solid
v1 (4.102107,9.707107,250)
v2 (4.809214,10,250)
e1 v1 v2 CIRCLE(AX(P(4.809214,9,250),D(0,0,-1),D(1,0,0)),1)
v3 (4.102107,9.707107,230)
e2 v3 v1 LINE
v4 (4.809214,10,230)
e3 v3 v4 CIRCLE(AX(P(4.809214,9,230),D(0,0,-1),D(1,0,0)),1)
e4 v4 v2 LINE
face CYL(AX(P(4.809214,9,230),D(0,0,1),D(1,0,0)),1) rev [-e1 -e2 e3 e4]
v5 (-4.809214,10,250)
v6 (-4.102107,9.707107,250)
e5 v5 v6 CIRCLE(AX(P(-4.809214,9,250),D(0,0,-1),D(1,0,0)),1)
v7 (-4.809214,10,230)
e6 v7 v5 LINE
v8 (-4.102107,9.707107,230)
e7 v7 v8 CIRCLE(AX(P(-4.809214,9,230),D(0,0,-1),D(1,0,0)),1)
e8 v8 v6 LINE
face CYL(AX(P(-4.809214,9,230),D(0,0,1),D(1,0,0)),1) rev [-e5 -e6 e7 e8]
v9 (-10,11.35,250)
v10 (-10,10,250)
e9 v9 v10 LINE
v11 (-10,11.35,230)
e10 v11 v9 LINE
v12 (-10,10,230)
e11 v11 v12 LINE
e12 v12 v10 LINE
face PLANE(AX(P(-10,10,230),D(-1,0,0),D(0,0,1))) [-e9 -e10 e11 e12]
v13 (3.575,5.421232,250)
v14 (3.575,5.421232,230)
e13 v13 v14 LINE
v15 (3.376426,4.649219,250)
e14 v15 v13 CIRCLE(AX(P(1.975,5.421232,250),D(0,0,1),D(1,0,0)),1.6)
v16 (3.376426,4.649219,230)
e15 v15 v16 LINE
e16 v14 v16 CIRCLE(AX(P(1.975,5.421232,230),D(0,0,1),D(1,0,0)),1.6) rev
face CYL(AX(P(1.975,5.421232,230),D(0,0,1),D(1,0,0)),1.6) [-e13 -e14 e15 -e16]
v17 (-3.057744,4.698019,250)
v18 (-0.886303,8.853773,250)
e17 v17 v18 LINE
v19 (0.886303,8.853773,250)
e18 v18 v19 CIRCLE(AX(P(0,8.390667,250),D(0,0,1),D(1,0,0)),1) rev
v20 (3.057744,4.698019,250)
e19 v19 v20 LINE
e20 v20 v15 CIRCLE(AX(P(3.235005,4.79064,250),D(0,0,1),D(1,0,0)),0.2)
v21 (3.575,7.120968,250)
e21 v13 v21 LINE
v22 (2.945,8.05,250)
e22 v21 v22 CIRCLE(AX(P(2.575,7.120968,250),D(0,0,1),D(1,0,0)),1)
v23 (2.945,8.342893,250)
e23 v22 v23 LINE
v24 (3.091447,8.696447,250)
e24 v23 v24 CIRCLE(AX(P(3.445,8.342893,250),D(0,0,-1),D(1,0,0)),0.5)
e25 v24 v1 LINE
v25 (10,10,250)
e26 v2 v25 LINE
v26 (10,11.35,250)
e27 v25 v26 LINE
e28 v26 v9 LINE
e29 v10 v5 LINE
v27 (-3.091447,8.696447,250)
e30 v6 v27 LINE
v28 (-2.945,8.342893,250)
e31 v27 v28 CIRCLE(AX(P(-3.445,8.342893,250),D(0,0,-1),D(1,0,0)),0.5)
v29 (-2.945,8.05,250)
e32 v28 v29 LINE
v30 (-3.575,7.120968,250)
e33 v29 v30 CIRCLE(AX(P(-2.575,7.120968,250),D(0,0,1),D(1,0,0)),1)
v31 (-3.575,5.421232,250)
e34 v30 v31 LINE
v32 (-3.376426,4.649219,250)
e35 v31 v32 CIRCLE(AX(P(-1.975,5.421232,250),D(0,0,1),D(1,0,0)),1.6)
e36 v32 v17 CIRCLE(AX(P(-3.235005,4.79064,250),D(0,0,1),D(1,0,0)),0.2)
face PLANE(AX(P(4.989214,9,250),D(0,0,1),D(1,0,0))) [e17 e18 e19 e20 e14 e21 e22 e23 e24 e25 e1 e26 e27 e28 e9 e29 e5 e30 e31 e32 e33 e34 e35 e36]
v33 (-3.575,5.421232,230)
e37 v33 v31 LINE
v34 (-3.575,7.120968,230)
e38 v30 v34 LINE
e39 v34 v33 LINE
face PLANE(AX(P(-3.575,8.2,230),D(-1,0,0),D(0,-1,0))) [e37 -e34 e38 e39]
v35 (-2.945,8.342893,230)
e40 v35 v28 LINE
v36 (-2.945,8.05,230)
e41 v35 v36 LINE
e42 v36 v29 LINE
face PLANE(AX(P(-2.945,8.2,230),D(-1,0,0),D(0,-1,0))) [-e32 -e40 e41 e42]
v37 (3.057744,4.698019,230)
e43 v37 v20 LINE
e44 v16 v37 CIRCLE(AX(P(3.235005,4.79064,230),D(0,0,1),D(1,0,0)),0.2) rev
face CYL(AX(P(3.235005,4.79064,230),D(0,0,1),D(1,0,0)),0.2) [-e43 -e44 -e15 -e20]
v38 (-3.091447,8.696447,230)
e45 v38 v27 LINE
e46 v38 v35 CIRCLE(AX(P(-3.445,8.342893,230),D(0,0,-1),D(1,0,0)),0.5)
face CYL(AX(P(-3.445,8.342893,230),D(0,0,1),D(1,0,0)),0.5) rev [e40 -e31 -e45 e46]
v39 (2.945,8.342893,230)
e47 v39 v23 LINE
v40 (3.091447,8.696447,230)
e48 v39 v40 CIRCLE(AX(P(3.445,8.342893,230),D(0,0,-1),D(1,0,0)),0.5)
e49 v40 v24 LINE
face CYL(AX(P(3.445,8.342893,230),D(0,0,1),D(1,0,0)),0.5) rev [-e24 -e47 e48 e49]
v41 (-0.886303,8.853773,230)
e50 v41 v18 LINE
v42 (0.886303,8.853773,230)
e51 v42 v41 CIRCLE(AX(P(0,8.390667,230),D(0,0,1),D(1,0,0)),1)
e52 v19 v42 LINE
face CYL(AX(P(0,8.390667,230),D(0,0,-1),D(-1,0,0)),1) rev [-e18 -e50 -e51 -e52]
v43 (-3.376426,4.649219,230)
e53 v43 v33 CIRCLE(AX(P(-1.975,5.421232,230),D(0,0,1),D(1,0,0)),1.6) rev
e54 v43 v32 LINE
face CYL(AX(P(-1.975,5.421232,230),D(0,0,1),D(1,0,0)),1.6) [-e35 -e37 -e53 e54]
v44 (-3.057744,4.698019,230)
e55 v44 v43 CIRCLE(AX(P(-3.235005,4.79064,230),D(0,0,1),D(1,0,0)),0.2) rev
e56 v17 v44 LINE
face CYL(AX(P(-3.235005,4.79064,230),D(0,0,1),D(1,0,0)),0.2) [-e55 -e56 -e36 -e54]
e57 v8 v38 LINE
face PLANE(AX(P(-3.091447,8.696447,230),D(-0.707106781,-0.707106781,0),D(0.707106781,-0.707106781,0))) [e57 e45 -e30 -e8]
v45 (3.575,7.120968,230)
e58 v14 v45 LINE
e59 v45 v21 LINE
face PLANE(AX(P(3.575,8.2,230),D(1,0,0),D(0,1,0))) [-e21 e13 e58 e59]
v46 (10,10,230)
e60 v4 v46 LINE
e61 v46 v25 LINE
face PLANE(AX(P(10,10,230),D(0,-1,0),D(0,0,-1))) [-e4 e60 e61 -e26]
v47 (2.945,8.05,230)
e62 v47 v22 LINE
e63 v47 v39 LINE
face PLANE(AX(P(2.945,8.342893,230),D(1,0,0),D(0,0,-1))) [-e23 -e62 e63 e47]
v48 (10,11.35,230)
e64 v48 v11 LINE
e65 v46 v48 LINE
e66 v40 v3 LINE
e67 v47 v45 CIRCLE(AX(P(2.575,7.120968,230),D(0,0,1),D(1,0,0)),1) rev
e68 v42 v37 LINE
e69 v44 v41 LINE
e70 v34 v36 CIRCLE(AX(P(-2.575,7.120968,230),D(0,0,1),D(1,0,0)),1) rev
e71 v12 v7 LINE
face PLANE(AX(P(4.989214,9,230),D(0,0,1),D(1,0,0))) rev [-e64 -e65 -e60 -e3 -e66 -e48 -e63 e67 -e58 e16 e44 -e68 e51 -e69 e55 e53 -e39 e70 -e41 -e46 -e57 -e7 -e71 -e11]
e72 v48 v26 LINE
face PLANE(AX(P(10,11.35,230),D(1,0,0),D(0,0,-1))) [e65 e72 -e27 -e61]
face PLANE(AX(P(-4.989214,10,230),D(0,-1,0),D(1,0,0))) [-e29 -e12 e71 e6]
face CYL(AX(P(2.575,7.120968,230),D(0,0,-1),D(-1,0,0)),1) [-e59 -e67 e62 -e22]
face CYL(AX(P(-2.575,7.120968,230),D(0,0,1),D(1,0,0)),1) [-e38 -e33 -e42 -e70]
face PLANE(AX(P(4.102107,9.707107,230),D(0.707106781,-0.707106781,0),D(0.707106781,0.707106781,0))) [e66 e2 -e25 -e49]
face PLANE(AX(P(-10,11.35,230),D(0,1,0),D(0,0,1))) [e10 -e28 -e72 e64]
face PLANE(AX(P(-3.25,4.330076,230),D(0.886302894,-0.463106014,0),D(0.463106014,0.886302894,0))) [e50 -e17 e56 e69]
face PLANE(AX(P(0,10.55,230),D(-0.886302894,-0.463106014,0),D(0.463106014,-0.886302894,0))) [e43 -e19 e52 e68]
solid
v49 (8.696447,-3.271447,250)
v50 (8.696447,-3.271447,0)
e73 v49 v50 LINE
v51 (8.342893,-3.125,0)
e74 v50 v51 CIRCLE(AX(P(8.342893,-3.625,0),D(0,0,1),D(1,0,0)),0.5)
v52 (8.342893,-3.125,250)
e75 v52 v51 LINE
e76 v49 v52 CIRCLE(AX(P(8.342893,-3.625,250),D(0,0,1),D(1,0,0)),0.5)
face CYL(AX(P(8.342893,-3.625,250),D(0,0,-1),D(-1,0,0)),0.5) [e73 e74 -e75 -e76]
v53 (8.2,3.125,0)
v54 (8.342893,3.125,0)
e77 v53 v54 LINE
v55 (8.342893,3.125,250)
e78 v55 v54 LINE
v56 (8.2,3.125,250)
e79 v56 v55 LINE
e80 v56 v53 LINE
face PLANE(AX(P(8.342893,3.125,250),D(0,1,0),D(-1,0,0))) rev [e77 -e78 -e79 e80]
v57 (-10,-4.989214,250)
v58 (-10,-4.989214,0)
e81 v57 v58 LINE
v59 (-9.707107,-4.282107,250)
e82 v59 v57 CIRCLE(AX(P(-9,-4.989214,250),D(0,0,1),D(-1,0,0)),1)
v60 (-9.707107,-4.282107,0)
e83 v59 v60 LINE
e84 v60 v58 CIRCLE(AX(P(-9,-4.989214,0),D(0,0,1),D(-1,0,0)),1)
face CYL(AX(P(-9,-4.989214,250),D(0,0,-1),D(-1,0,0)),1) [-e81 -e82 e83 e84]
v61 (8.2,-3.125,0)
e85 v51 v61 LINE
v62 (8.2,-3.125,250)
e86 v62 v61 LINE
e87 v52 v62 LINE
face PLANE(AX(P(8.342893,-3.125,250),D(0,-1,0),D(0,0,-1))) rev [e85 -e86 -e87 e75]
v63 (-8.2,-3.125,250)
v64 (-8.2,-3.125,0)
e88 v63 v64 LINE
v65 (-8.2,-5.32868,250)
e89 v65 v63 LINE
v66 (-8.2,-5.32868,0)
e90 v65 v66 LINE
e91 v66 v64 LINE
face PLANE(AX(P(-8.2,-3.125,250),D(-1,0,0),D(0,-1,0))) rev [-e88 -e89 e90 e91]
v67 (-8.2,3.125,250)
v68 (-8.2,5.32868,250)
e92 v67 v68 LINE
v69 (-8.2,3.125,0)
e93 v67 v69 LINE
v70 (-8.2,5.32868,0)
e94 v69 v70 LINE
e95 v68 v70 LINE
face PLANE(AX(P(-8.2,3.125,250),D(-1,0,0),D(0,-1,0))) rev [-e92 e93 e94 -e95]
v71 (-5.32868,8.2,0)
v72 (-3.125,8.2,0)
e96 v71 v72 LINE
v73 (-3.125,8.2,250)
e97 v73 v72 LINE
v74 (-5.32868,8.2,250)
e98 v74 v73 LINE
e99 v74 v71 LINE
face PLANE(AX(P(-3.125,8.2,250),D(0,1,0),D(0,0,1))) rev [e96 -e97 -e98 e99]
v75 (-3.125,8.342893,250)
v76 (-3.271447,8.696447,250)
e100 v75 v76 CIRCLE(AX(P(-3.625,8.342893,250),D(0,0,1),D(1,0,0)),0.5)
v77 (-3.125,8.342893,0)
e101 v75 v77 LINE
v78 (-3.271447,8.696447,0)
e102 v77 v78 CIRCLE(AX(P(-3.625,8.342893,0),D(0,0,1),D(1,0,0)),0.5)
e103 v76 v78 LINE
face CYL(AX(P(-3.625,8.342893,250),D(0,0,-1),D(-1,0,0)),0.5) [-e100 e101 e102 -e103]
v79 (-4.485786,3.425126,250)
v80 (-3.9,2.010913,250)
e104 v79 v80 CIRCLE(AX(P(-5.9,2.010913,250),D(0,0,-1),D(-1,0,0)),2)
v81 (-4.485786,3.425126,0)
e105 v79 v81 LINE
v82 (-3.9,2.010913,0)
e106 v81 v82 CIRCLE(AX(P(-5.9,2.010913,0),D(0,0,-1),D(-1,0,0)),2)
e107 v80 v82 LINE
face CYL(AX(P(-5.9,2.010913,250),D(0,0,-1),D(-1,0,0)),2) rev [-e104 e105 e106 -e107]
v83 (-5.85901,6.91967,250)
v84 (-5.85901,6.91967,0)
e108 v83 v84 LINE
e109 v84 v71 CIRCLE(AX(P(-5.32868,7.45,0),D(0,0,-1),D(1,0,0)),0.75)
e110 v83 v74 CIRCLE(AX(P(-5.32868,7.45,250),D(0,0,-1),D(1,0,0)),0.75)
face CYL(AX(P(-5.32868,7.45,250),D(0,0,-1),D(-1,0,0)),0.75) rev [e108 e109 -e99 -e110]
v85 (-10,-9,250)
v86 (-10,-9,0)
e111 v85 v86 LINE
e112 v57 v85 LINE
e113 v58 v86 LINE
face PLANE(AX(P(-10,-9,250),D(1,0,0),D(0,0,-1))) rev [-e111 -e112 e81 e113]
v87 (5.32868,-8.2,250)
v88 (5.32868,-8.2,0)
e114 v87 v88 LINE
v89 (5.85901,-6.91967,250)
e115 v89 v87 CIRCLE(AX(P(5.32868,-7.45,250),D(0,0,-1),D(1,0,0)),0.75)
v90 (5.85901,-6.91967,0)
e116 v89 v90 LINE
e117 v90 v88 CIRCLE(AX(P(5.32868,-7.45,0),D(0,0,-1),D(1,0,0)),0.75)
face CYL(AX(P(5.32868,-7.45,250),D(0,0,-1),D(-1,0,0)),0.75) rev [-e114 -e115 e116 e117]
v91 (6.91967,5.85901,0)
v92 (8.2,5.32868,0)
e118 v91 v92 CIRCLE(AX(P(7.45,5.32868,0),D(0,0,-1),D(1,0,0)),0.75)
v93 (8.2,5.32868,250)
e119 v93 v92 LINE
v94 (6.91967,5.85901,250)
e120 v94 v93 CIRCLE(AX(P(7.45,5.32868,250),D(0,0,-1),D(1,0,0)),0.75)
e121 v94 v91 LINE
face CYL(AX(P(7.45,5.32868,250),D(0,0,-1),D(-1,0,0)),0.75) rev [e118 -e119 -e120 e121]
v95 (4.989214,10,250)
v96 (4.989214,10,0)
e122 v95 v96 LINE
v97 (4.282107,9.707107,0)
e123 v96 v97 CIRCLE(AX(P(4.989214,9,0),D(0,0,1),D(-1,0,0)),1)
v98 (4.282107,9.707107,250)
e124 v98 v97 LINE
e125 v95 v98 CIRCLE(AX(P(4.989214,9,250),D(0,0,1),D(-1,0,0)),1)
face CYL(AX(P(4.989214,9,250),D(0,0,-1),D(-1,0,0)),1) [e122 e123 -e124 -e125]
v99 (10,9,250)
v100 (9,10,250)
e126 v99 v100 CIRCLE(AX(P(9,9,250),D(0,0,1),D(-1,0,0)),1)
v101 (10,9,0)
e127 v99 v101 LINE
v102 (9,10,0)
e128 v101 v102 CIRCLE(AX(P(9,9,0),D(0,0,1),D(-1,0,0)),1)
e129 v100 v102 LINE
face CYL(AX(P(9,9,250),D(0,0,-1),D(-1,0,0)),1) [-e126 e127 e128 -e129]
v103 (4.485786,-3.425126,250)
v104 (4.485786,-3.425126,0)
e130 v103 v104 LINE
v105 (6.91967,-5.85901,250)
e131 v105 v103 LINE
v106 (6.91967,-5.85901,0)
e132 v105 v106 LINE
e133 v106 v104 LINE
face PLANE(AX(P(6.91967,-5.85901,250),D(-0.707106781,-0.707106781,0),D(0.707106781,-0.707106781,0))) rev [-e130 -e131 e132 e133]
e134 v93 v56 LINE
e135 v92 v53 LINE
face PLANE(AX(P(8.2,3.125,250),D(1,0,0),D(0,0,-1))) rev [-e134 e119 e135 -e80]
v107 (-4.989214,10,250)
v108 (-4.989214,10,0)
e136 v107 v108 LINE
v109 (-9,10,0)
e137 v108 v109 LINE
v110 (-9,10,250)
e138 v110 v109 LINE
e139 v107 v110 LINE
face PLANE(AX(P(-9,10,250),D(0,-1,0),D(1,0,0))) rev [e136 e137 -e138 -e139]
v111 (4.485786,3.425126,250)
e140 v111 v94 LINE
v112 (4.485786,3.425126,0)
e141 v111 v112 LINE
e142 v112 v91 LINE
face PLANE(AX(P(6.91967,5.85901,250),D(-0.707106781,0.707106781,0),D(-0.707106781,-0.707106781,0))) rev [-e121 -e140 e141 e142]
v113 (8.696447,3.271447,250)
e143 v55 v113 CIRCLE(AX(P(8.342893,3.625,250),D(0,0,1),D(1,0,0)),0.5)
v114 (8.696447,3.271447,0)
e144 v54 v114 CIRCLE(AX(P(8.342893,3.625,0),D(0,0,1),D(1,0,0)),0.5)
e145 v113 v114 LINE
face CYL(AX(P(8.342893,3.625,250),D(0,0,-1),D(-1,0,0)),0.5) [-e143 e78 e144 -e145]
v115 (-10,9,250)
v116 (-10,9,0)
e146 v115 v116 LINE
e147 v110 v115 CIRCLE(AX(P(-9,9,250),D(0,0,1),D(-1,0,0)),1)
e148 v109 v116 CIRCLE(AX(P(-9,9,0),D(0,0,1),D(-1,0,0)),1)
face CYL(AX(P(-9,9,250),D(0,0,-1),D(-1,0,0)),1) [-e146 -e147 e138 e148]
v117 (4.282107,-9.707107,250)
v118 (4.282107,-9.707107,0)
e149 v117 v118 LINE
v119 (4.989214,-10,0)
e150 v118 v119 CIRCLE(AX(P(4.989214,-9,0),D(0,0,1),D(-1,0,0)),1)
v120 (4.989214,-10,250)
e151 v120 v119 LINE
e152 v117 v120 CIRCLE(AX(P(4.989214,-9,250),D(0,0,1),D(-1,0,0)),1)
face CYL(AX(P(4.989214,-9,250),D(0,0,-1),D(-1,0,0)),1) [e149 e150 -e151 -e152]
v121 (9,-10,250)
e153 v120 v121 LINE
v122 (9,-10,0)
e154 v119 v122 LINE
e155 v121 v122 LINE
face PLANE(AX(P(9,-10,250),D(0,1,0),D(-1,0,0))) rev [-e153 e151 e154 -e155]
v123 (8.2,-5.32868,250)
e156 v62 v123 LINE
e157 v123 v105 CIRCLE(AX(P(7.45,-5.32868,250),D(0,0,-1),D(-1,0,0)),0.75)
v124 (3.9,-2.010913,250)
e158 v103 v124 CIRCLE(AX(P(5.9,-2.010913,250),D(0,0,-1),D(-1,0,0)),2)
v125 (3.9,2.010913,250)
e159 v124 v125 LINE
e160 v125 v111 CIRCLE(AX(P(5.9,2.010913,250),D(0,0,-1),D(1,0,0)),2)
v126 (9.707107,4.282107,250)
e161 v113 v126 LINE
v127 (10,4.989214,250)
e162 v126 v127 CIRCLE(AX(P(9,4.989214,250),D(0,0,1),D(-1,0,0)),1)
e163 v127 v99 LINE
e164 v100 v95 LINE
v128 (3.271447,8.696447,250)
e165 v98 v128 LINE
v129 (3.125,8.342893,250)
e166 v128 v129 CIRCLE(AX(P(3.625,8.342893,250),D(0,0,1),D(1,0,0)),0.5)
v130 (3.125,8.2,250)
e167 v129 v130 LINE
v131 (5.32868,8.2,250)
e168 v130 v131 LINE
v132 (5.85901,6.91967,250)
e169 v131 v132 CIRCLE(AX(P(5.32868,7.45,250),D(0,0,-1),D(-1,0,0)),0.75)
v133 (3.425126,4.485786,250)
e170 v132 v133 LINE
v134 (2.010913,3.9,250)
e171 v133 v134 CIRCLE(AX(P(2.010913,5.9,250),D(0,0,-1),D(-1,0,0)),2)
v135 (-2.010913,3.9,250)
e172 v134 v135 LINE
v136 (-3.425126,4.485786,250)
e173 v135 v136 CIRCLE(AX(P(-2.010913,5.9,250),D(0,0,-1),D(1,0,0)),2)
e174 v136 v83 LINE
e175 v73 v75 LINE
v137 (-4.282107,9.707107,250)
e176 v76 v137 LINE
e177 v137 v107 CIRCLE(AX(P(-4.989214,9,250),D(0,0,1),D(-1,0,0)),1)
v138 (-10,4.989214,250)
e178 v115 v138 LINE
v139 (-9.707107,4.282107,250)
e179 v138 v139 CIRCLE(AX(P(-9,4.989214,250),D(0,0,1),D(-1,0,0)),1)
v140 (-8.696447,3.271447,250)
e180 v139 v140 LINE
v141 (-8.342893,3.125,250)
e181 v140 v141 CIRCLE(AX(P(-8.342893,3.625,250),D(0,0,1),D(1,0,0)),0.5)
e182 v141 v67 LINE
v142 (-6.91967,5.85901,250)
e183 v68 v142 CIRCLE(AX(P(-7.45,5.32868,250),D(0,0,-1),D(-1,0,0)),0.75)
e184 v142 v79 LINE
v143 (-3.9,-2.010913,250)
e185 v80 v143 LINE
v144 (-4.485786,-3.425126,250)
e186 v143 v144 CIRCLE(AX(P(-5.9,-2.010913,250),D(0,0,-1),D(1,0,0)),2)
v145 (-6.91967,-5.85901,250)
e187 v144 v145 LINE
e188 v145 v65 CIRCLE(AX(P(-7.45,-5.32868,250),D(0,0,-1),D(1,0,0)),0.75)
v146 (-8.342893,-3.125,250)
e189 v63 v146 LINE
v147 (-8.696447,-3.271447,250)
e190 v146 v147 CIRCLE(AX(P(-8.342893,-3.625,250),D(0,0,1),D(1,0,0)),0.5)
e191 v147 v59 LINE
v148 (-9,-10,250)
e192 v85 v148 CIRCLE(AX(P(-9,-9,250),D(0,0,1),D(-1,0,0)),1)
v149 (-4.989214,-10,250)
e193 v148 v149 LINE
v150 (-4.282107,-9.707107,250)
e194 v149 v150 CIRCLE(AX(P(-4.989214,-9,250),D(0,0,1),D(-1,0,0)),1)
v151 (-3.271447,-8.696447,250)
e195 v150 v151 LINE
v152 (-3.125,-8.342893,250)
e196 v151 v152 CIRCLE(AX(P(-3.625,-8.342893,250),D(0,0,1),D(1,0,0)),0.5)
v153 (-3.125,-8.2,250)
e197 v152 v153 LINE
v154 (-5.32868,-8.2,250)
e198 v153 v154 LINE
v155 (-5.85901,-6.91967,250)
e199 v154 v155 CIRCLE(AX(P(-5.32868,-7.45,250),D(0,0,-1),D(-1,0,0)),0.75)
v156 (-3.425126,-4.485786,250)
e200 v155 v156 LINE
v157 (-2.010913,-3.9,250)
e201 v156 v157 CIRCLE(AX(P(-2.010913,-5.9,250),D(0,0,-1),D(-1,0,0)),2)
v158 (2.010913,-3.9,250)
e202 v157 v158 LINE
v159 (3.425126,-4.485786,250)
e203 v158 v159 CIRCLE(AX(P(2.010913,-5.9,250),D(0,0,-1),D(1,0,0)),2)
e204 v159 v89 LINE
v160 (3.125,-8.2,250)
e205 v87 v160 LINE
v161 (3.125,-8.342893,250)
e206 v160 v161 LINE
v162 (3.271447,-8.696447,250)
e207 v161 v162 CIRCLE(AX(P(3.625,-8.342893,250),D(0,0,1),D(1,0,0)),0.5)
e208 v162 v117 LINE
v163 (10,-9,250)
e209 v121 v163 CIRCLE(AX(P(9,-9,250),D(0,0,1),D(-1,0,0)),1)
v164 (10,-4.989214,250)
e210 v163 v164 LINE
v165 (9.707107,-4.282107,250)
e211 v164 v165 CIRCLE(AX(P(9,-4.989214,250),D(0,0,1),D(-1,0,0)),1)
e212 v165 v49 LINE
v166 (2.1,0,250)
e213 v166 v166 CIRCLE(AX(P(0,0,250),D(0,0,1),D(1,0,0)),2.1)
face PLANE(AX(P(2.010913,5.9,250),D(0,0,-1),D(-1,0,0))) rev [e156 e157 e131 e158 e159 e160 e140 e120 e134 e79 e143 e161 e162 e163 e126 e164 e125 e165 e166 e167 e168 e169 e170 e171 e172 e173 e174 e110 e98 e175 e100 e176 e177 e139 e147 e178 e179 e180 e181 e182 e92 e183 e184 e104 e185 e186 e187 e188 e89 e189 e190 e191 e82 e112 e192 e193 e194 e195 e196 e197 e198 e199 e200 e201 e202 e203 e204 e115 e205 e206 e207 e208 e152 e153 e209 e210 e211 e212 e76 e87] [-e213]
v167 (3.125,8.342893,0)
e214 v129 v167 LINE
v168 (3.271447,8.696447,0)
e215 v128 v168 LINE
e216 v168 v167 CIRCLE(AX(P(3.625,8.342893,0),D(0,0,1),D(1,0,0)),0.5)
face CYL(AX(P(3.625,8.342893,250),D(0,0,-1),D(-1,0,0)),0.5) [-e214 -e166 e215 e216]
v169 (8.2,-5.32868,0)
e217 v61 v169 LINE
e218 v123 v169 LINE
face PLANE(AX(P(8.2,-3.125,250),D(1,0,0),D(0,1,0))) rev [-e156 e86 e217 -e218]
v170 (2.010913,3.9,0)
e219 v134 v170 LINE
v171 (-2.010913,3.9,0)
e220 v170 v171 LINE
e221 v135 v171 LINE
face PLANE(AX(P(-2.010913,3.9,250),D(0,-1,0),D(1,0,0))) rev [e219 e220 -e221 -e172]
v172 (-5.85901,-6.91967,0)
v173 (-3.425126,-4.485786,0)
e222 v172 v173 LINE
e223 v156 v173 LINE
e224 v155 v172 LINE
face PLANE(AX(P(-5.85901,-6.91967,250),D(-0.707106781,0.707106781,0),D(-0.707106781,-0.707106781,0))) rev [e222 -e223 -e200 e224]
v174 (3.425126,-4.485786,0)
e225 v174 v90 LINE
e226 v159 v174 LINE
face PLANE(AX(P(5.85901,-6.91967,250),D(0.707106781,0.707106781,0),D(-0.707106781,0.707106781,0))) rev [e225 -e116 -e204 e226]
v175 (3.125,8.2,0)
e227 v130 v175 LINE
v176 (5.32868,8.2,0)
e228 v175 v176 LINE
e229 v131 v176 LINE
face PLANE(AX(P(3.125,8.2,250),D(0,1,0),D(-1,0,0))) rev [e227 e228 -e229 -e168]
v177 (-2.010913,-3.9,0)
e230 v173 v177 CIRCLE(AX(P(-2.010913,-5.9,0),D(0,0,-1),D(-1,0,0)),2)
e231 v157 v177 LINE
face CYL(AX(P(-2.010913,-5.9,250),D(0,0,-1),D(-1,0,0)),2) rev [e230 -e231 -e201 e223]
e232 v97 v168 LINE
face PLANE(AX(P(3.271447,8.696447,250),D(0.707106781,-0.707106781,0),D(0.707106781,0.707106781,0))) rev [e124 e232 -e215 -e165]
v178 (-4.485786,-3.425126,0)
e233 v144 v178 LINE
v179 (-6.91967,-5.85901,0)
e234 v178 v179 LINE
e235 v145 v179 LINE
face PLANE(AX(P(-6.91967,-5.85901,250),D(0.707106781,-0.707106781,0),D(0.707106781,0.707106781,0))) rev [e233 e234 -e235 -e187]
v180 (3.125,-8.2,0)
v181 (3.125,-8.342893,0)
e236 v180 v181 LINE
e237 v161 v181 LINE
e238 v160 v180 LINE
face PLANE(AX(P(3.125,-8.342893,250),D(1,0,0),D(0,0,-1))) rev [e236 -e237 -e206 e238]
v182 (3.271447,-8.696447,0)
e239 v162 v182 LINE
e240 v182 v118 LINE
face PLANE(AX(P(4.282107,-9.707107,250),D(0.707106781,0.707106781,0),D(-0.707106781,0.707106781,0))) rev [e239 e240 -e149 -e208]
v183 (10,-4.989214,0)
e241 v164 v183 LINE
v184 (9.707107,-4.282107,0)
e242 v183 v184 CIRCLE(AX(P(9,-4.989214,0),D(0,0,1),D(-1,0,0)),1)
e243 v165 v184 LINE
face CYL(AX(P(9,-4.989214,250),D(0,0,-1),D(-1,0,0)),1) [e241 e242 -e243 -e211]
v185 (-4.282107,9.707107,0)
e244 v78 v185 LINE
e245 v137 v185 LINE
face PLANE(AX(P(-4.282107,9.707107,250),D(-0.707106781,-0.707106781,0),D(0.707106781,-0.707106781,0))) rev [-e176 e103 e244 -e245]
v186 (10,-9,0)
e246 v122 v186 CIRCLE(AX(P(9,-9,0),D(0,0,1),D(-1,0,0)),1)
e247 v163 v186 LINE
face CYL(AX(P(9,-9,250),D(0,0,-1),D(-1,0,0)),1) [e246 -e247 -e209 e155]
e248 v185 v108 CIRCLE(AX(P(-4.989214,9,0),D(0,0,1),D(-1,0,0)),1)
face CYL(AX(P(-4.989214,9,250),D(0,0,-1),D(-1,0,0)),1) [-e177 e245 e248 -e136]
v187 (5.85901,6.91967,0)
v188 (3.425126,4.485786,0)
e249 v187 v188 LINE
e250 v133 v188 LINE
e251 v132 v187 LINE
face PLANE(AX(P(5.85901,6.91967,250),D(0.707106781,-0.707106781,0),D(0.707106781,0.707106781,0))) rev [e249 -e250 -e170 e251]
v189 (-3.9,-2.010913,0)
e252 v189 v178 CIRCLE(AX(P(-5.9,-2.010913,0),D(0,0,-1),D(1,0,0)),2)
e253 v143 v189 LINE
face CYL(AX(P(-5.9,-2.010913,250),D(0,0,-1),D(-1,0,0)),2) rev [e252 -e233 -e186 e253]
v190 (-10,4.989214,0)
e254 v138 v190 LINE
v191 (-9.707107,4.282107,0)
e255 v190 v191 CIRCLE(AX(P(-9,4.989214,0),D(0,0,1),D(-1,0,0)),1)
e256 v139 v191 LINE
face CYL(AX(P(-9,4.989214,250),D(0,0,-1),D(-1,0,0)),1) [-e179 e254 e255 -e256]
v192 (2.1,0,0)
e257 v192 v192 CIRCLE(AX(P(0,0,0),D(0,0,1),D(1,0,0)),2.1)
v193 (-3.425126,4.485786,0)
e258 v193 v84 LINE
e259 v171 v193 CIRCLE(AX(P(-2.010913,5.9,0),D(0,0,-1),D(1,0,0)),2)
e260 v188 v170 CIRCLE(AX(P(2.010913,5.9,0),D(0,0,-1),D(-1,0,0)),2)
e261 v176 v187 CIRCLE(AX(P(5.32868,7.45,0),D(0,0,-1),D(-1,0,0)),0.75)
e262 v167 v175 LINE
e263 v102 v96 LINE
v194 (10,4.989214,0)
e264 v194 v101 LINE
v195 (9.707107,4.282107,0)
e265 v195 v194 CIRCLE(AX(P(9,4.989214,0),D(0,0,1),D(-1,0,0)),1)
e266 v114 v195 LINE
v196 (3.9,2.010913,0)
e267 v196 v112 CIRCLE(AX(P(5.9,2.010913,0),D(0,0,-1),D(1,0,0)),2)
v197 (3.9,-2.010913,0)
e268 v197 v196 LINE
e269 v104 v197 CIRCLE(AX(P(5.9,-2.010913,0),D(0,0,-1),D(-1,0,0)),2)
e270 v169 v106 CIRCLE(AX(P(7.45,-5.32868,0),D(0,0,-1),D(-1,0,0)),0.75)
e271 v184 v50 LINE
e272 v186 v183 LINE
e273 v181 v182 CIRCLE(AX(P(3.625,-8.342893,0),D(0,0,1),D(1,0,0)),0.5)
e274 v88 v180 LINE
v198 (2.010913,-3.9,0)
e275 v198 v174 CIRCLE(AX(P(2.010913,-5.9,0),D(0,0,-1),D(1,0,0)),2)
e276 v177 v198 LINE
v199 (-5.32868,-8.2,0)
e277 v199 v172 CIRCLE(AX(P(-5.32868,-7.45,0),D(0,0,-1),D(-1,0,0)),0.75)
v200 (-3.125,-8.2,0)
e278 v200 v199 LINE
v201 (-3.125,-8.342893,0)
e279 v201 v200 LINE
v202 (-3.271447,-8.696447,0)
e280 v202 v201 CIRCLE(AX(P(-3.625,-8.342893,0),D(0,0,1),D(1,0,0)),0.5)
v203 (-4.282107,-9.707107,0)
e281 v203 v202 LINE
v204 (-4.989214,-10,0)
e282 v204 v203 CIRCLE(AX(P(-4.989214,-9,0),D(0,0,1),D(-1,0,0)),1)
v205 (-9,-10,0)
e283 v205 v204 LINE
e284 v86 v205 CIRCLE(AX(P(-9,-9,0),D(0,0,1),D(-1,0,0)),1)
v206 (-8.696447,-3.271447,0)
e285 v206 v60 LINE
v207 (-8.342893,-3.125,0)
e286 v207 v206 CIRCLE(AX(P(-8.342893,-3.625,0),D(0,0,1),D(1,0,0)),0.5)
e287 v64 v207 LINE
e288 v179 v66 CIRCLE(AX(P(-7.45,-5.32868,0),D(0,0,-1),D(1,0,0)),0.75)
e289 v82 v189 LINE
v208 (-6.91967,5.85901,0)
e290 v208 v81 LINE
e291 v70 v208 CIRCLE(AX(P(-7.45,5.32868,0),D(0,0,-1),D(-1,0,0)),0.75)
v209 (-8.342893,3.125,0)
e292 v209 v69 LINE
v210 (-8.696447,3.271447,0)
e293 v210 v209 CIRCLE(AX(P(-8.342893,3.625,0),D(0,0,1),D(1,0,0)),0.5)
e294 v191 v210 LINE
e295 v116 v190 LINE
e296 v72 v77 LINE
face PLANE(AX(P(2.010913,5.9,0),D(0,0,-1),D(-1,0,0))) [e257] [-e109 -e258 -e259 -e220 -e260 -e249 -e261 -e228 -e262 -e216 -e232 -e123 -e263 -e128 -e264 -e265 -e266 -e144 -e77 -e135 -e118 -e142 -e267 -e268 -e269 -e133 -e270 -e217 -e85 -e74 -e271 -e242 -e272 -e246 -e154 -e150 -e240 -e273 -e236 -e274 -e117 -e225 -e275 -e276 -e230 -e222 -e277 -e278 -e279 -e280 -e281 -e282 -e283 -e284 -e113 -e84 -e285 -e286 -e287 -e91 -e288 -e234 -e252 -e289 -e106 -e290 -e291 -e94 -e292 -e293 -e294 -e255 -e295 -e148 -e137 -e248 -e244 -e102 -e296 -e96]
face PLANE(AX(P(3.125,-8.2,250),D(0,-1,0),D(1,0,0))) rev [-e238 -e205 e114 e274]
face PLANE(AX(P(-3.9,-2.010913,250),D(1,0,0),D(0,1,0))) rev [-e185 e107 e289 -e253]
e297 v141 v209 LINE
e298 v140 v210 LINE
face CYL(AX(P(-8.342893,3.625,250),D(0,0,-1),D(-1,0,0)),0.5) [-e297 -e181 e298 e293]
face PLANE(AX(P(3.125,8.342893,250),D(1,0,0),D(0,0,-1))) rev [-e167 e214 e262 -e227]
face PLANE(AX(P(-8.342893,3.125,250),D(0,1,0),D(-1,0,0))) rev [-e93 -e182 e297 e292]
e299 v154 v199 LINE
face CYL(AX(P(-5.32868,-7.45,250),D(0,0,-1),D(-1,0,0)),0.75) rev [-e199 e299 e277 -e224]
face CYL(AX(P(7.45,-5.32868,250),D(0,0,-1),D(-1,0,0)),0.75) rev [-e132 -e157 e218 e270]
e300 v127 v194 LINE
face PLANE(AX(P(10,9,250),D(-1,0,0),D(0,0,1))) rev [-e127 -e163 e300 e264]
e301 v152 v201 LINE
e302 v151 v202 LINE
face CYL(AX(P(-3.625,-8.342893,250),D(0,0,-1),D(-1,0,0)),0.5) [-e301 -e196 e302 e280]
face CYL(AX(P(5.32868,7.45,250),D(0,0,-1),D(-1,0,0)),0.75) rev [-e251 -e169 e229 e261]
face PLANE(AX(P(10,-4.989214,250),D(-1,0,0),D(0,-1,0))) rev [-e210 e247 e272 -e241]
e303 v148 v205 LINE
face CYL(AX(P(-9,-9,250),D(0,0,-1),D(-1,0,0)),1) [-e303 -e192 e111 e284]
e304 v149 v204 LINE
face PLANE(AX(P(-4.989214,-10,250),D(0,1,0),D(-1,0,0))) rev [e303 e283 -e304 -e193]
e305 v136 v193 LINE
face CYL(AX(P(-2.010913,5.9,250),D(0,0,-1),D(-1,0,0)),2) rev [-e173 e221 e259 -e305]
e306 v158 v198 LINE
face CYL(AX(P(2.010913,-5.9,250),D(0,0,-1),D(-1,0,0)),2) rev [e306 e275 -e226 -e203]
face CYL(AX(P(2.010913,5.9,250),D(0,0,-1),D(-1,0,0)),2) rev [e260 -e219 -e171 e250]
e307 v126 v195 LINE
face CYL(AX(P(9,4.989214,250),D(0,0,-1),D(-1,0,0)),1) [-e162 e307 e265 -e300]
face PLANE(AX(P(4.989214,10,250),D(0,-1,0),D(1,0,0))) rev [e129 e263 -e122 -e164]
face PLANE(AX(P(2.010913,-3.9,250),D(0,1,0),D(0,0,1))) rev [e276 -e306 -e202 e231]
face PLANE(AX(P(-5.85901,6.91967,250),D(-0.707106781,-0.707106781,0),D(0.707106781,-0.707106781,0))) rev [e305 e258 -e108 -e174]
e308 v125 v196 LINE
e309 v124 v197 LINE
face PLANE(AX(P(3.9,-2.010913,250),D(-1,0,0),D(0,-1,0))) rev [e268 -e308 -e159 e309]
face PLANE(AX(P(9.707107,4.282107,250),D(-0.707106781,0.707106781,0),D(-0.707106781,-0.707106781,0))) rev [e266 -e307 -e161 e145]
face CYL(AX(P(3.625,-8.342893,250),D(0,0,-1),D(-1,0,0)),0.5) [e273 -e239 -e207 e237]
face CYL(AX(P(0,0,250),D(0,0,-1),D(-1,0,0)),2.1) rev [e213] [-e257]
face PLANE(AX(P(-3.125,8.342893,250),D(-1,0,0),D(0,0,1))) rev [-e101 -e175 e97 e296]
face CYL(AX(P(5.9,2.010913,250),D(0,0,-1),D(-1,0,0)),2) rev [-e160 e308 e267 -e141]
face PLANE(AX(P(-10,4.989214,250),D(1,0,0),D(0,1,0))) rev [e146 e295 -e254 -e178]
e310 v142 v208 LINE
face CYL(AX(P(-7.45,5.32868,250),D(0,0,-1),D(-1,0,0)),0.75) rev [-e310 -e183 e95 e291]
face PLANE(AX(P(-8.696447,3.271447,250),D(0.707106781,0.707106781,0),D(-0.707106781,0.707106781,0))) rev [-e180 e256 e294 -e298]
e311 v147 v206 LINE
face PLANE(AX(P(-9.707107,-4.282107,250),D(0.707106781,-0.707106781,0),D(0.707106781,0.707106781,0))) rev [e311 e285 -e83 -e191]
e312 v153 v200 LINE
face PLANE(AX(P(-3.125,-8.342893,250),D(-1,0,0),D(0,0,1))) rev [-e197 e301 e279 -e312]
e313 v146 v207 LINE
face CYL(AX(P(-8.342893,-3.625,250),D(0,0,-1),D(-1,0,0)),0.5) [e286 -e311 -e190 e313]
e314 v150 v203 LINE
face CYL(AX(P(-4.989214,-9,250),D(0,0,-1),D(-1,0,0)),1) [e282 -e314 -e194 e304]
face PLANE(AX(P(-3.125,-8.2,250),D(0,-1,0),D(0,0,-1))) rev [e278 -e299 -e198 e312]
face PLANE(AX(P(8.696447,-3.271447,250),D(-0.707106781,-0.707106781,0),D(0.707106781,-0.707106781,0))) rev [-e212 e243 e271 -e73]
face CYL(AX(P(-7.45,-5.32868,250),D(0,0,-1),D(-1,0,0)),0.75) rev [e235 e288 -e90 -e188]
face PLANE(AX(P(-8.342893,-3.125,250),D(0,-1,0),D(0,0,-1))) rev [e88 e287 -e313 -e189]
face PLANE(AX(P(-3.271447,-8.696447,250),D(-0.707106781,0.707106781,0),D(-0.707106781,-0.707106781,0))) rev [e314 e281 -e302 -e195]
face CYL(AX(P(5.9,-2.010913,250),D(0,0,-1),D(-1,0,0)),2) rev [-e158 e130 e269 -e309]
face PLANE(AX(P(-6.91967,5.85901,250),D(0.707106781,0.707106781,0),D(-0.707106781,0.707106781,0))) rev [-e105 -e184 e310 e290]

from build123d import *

# Parameters (mm, degrees)
SKETCH_1_R          = 2.1
EXTRUDE_1_DEPTH     = 250
BOSS_EXTRUDE1_DEPTH = 20
MOVE_START          = 230
MOVE_FACE1_DEPTH    = 20
MOVE_FACE2_DEPTH    = 20
MOVE_FACE3_BY       = 0.15
MOVE_FACE3_2_BY     = 0.15
MOVE_FACE3_3_BY     = 0.15
MOVE_FACE3_4_BY     = 0.15
MOVE_FACE3_5_BY     = 0.15
MOVE_FACE3_6_BY     = 0.15
MOVE_FACE3_7_BY     = 0.15
MOVE_FACE3_8_BY     = 0.15
FILLET1_R           = 1
FILLET2_R           = 0.2
FILLET3_R           = 1.6
FILLET4_R           = 1


with BuildPart() as part:
    # Эскиз1 → Бобышка-Вытянуть1 (new body)
    with BuildSketch(Plane.XY):
        with BuildLine():
            Line((3.125, 8.342893219), (3.125, 8.2))
            Line((3.125, 8.2), (5.328679656, 8.2))
            ThreePointArc((5.328679656, 8.2), (6.021589306, 7.737012574), (5.859009742, 6.919669914))
            Line((5.859009742, 6.919669914), (3.425126266, 4.485786438))
            ThreePointArc((3.425126266, 4.485786438), (2.776279568, 4.052240935), (2.010912703, 3.9))
            Line((2.010912703, 3.9), (-2.010912703, 3.9))
            ThreePointArc((-2.010912703, 3.9), (-2.776279568, 4.052240935), (-3.425126266, 4.485786438))
            Line((-3.425126266, 4.485786438), (-5.859009742, 6.919669914))
            ThreePointArc((-5.859009742, 6.919669914), (-6.021589306, 7.737012574), (-5.328679656, 8.2))
            Line((-5.328679656, 8.2), (-3.125, 8.2))
            Line((-3.125, 8.2), (-3.125, 8.342893219))
            ThreePointArc((-3.125, 8.342893219), (-3.163060234, 8.534234935), (-3.271446609, 8.696446609))
            Line((-3.271446609, 8.696446609), (-4.282106781, 9.707106781))
            ThreePointArc((-4.282106781, 9.707106781), (-4.60653013, 9.923879533), (-4.989213562, 10))
            Line((-4.989213562, 10), (-9, 10))
            ThreePointArc((-9, 10), (-9.707106781, 9.707106781), (-10, 9))
            Line((-10, 9), (-10, 4.989213562))
            ThreePointArc((-10, 4.989213562), (-9.923879533, 4.60653013), (-9.707106781, 4.282106781))
            Line((-9.707106781, 4.282106781), (-8.696446609, 3.271446609))
            ThreePointArc((-8.696446609, 3.271446609), (-8.534234935, 3.163060234), (-8.342893219, 3.125))
            Line((-8.342893219, 3.125), (-8.2, 3.125))
            Line((-8.2, 3.125), (-8.2, 5.328679656))
            ThreePointArc((-8.2, 5.328679656), (-7.737012574, 6.021589306), (-6.919669914, 5.859009742))
            Line((-6.919669914, 5.859009742), (-4.485786438, 3.425126266))
            ThreePointArc((-4.485786438, 3.425126266), (-4.052240935, 2.776279568), (-3.9, 2.010912703))
            Line((-3.9, 2.010912703), (-3.9, -2.010912703))
            ThreePointArc((-3.9, -2.010912703), (-4.052240935, -2.776279568), (-4.485786438, -3.425126266))
            Line((-4.485786438, -3.425126266), (-6.919669914, -5.859009742))
            ThreePointArc((-6.919669914, -5.859009742), (-7.737012574, -6.021589306), (-8.2, -5.328679656))
            Line((-8.2, -5.328679656), (-8.2, -3.125))
            Line((-8.2, -3.125), (-8.342893219, -3.125))
            ThreePointArc((-8.342893219, -3.125), (-8.534234935, -3.163060234), (-8.696446609, -3.271446609))
            Line((-8.696446609, -3.271446609), (-9.707106781, -4.282106781))
            ThreePointArc((-9.707106781, -4.282106781), (-9.923879533, -4.60653013), (-10, -4.989213562))
            Line((-10, -4.989213562), (-10, -9))
            ThreePointArc((-10, -9), (-9.707106781, -9.707106781), (-9, -10))
            Line((-9, -10), (-4.989213562, -10))
            ThreePointArc((-4.989213562, -10), (-4.60653013, -9.923879533), (-4.282106781, -9.707106781))
            Line((-4.282106781, -9.707106781), (-3.271446609, -8.696446609))
            ThreePointArc((-3.271446609, -8.696446609), (-3.163060234, -8.534234935), (-3.125, -8.342893219))
            Line((-3.125, -8.342893219), (-3.125, -8.2))
            Line((-3.125, -8.2), (-5.328679656, -8.2))
            ThreePointArc((-5.328679656, -8.2), (-6.021589306, -7.737012574), (-5.859009742, -6.919669914))
            Line((-5.859009742, -6.919669914), (-3.425126266, -4.485786438))
            ThreePointArc((-3.425126266, -4.485786438), (-2.776279568, -4.052240935), (-2.010912703, -3.9))
            Line((-2.010912703, -3.9), (2.010912703, -3.9))
            ThreePointArc((2.010912703, -3.9), (2.776279568, -4.052240935), (3.425126266, -4.485786438))
            Line((3.425126266, -4.485786438), (5.859009742, -6.919669914))
            ThreePointArc((5.859009742, -6.919669914), (6.021589306, -7.737012574), (5.328679656, -8.2))
            Line((5.328679656, -8.2), (3.125, -8.2))
            Line((3.125, -8.2), (3.125, -8.342893219))
            ThreePointArc((3.125, -8.342893219), (3.163060234, -8.534234935), (3.271446609, -8.696446609))
            Line((3.271446609, -8.696446609), (4.282106781, -9.707106781))
            ThreePointArc((4.282106781, -9.707106781), (4.60653013, -9.923879533), (4.989213562, -10))
            Line((4.989213562, -10), (9, -10))
            ThreePointArc((9, -10), (9.707106781, -9.707106781), (10, -9))
            Line((10, -9), (10, -4.989213562))
            ThreePointArc((10, -4.989213562), (9.923879533, -4.60653013), (9.707106781, -4.282106781))
            Line((9.707106781, -4.282106781), (8.696446609, -3.271446609))
            ThreePointArc((8.696446609, -3.271446609), (8.534234935, -3.163060234), (8.342893219, -3.125))
            Line((8.342893219, -3.125), (8.2, -3.125))
            Line((8.2, -3.125), (8.2, -5.328679656))
            ThreePointArc((8.2, -5.328679656), (7.737012574, -6.021589306), (6.919669914, -5.859009742))
            Line((6.919669914, -5.859009742), (4.485786438, -3.425126266))
            ThreePointArc((4.485786438, -3.425126266), (4.052240935, -2.776279568), (3.9, -2.010912703))
            Line((3.9, -2.010912703), (3.9, 2.010912703))
            ThreePointArc((3.9, 2.010912703), (4.052240935, 2.776279568), (4.485786438, 3.425126266))
            Line((4.485786438, 3.425126266), (6.919669914, 5.859009742))
            ThreePointArc((6.919669914, 5.859009742), (7.737012574, 6.021589306), (8.2, 5.328679656))
            Line((8.2, 5.328679656), (8.2, 3.125))
            Line((8.2, 3.125), (8.342893219, 3.125))
            ThreePointArc((8.342893219, 3.125), (8.534234935, 3.163060234), (8.696446609, 3.271446609))
            Line((8.696446609, 3.271446609), (9.707106781, 4.282106781))
            ThreePointArc((9.707106781, 4.282106781), (9.923879533, 4.60653013), (10, 4.989213562))
            Line((10, 4.989213562), (10, 9))
            ThreePointArc((10, 9), (9.707106781, 9.707106781), (9, 10))
            Line((9, 10), (4.989213562, 10))
            ThreePointArc((4.989213562, 10), (4.60653013, 9.923879533), (4.282106781, 9.707106781))
            Line((4.282106781, 9.707106781), (3.271446609, 8.696446609))
            ThreePointArc((3.271446609, 8.696446609), (3.163060234, 8.534234935), (3.125, 8.342893219))
        make_face()
        Circle(SKETCH_1_R, mode=Mode.SUBTRACT)
    extrude(amount=EXTRUDE_1_DEPTH)


with BuildPart() as body_2:
    # Sketch1 → Boss-Extrude1 (new body)
    with BuildSketch(Plane.XY.offset(250)):
        with BuildLine():
            Line((-9, 10), (-10, 10))
            Line((-10, 10), (-10, 11.35))
            Line((-10, 11.35), (10, 11.35))
            Line((10, 11.35), (10, 10))
            Line((10, 10), (9, 10))
            Line((9, 10), (4.989213562, 10))
            ThreePointArc((4.989213562, 10), (4.60653013, 9.923879533), (4.282106781, 9.707106781))
            Line((4.282106781, 9.707106781), (3.271446609, 8.696446609))
            ThreePointArc((3.271446609, 8.696446609), (3.163060234, 8.534234935), (3.125, 8.342893219))
            Line((3.125, 8.342893219), (3.125, 8.2))
            Line((3.125, 8.2), (3.725, 8.2))
            Line((3.725, 8.2), (3.725, 4.785660172))
            Line((3.725, 4.785660172), (3.425126266, 4.485786438))
            ThreePointArc((3.425126266, 4.485786438), (3.33984567, 4.405363867), (3.25, 4.330075584))
            Line((3.25, 4.330075584), (0, 10.55))
            Line((0, 10.55), (-3.25, 4.330075584))
            ThreePointArc((-3.25, 4.330075584), (-3.33984567, 4.405363867), (-3.425126266, 4.485786438))
            Line((-3.425126266, 4.485786438), (-3.725, 4.785660172))
            Line((-3.725, 4.785660172), (-3.725, 8.2))
            Line((-3.725, 8.2), (-3.125, 8.2))
            Line((-3.125, 8.2), (-3.125, 8.342893219))
            ThreePointArc((-3.125, 8.342893219), (-3.163060234, 8.534234935), (-3.271446609, 8.696446609))
            Line((-3.271446609, 8.696446609), (-4.282106781, 9.707106781))
            ThreePointArc((-4.282106781, 9.707106781), (-4.60653013, 9.923879533), (-4.989213562, 10))
            Line((-4.989213562, 10), (-9, 10))
        make_face()
    extrude(amount=-BOSS_EXTRUDE1_DEPTH)

    # Move Face1: read off the stored shape, not the designer's step
    # Move Face1 outline → Move Face1 (cut)
    with BuildSketch(Plane.XY.offset(MOVE_START)):
        with BuildLine():
            Line((-3.125, 8.2), (-2.945, 8.2))
            Line((-2.945, 8.2), (-2.945, 8.342893219))
            ThreePointArc((-2.945, 8.342893219), (-2.983060234, 8.534234935), (-3.091446609, 8.696446609))
            Line((-3.091446609, 8.696446609), (-4.102106781, 9.707106781))
            ThreePointArc((-4.102106781, 9.707106781), (-4.42653013, 9.923879533), (-4.809213562, 10))
            Line((-4.809213562, 10), (-4.989213562, 10))
            ThreePointArc((-4.989213562, 10), (-4.60653013, 9.923879533), (-4.282106781, 9.707106781))
            Line((-4.282106781, 9.707106781), (-3.271446609, 8.696446609))
            ThreePointArc((-3.271446609, 8.696446609), (-3.163060234, 8.534234935), (-3.125, 8.342893219))
            Line((-3.125, 8.342893219), (-3.125, 8.2))
        make_face()
    extrude(amount=MOVE_FACE1_DEPTH, mode=Mode.SUBTRACT)

    # Move Face2: read off the stored shape, not the designer's step
    # Move Face2 outline → Move Face2 (cut)
    with BuildSketch(Plane.XY.offset(MOVE_START)):
        with BuildLine():
            Line((4.989213562, 10), (4.809213562, 10))
            ThreePointArc((4.809213562, 10), (4.42653013, 9.923879533), (4.102106781, 9.707106781))
            Line((4.102106781, 9.707106781), (3.091446609, 8.696446609))
            ThreePointArc((3.091446609, 8.696446609), (2.983060234, 8.534234935), (2.945, 8.342893219))
            Line((2.945, 8.342893219), (2.945, 8.2))
            Line((2.945, 8.2), (3.125, 8.2))
            Line((3.125, 8.2), (3.125, 8.342893219))
            ThreePointArc((3.125, 8.342893219), (3.163060234, 8.534234935), (3.271446609, 8.696446609))
            Line((3.271446609, 8.696446609), (4.282106781, 9.707106781))
            ThreePointArc((4.282106781, 9.707106781), (4.60653013, 9.923879533), (4.989213562, 10))
        make_face()
    extrude(amount=MOVE_FACE2_DEPTH, mode=Mode.SUBTRACT)

    # Move Face3: a face moved inward by 0.15
    extrude(body_2.faces().sort_by_distance((3.335, 8.2, 240))[0], amount=MOVE_FACE3_BY, dir=(0, -1, 0), mode=Mode.SUBTRACT)

    # Move Face3 2: a face moved inward by 0.15
    extrude(body_2.faces().sort_by_distance((-3.335, 8.2, 240))[0], amount=MOVE_FACE3_2_BY, dir=(0, -1, 0), mode=Mode.SUBTRACT)

    # Move Face3 3: a face moved inward by 0.15
    extrude(body_2.faces().sort_by_distance((3.725, 6.492830086, 240))[0], amount=MOVE_FACE3_3_BY, dir=(-1, 0, 0), mode=Mode.SUBTRACT)

    # Move Face3 4: a curved face moved inward by 0.15
    add(Solid.thicken(body_2.faces().sort_by_distance((3.33984567, 4.405363867, 240))[0], -MOVE_FACE3_4_BY), mode=Mode.SUBTRACT)

    # Move Face3 5: a face moved inward by 0.15
    extrude(body_2.faces().sort_by_distance((3.575063133, 4.635723305, 240))[0], amount=MOVE_FACE3_5_BY, dir=(-0.707106781, 0.707106781, 0), mode=Mode.SUBTRACT)

    # Move Face3 6: a curved face moved inward by 0.15
    add(Solid.thicken(body_2.faces().sort_by_distance((-3.33984567, 4.405363867, 240))[0], -MOVE_FACE3_6_BY), mode=Mode.SUBTRACT)

    # Move Face3 7: a face moved inward by 0.15
    extrude(body_2.faces().sort_by_distance((-3.575063133, 4.635723305, 240))[0], amount=MOVE_FACE3_7_BY, dir=(0.707106781, 0.707106781, 0), mode=Mode.SUBTRACT)

    # Move Face3 8: a face moved inward by 0.15
    extrude(body_2.faces().sort_by_distance((-3.725, 6.492830086, 240))[0], amount=MOVE_FACE3_8_BY, dir=(1, 0, 0), mode=Mode.SUBTRACT)

    # Fillet1
    # the kernel refuses this fillet: 1 mm, written as the material it takes off along each edge
    with BuildSketch(Plane(origin=(3.575, 8.05, 252.322579385), x_dir=(0, -1, 0), z_dir=(0, 0, -1))) as fillet1_piece_1:
        with BuildLine():
            CenterArc((0.929031754, 1), FILLET1_R, 201.715617283, 68.284382717)
            Line((0, 0.63), (-0.018580635, 0.6226))
            ThreePointArc((-0.018580635, 0.6226), (-0.02, 0.315), (-0.02, 0))
            Line((-0.02, 0), (0, -0.02))
            Line((0, -0.02), (0.929031754, -0.02))
            Line((0.929031754, -0.02), (0.929031754, 0))
        make_face()
    extrude(amount=24.64515877, mode=Mode.SUBTRACT)
    with BuildSketch(Plane(origin=(-3.575, 8.05, 252.322579385), x_dir=(1, 0, 0), z_dir=(0, 0, -1))) as fillet1_piece_2:
        with BuildLine():
            CenterArc((1, 0.929031754), FILLET1_R, 180, 68.284382717)
            Line((0, 0.929031754), (-0.02, 0.929031754))
            Line((-0.02, 0.929031754), (-0.02, 0))
            Line((-0.02, 0), (0, -0.02))
            ThreePointArc((0, -0.02), (0.315, -0.02), (0.6226, -0.018580635))
            Line((0.6226, -0.018580635), (0.63, 0))
        make_face()
    extrude(amount=24.64515877, mode=Mode.SUBTRACT)

    # Fillet2
    fillet2_edges = [body_2.edges().sort_by_distance(p)[0] for p in [
        (3.179203519, 4.46556751, 240),
        (-3.179203519, 4.46556751, 240),
    ]]
    fillet(fillet2_edges, radius=FILLET2_R)

    # Fillet3
    # the kernel refuses this fillet: 1.6 mm, written as the material it takes off along each edge
    with BuildSketch(Plane(origin=(3.575, 4.847792206, 251.433598548), x_dir=(-0.7071067812067597, -0.7071067811663352, 0), z_dir=(0, 0, -1))) as fillet3_piece_1:
        with BuildLine():
            CenterArc((0.725887948, 1.536853752), FILLET3_R, 224.999999998, 28.849342749)
            Line((-0.405482902, 0.405482902), (0, 0))
            Line((0, 0), (0.280825542, 0))
        make_face()
    extrude(amount=22.867197096, mode=Mode.SUBTRACT)
    with BuildSketch(Plane(origin=(-3.575, 4.847792206, 251.433598548), x_dir=(0.7071067812067448, -0.7071067811663502, 0), z_dir=(0, 0, -1))) as fillet3_piece_2:
        with BuildLine():
            CenterArc((0.725887948, -1.536853752), FILLET3_R, 106.150657252, 28.849342749)
            Line((-0.405482902, -0.405482902), (0, 0))
            Line((0, 0), (0.280825542, 0))
        make_face()
    extrude(amount=22.867197096, mode=Mode.SUBTRACT)

    # Fillet4
    fillet4_edges = [body_2.edges().sort_by_distance(p)[0] for p in [
        (0, 10.55, 240),
    ]]
    fillet(fillet4_edges, radius=FILLET4_R)


solid = Compound([part.part, body_2.part])
